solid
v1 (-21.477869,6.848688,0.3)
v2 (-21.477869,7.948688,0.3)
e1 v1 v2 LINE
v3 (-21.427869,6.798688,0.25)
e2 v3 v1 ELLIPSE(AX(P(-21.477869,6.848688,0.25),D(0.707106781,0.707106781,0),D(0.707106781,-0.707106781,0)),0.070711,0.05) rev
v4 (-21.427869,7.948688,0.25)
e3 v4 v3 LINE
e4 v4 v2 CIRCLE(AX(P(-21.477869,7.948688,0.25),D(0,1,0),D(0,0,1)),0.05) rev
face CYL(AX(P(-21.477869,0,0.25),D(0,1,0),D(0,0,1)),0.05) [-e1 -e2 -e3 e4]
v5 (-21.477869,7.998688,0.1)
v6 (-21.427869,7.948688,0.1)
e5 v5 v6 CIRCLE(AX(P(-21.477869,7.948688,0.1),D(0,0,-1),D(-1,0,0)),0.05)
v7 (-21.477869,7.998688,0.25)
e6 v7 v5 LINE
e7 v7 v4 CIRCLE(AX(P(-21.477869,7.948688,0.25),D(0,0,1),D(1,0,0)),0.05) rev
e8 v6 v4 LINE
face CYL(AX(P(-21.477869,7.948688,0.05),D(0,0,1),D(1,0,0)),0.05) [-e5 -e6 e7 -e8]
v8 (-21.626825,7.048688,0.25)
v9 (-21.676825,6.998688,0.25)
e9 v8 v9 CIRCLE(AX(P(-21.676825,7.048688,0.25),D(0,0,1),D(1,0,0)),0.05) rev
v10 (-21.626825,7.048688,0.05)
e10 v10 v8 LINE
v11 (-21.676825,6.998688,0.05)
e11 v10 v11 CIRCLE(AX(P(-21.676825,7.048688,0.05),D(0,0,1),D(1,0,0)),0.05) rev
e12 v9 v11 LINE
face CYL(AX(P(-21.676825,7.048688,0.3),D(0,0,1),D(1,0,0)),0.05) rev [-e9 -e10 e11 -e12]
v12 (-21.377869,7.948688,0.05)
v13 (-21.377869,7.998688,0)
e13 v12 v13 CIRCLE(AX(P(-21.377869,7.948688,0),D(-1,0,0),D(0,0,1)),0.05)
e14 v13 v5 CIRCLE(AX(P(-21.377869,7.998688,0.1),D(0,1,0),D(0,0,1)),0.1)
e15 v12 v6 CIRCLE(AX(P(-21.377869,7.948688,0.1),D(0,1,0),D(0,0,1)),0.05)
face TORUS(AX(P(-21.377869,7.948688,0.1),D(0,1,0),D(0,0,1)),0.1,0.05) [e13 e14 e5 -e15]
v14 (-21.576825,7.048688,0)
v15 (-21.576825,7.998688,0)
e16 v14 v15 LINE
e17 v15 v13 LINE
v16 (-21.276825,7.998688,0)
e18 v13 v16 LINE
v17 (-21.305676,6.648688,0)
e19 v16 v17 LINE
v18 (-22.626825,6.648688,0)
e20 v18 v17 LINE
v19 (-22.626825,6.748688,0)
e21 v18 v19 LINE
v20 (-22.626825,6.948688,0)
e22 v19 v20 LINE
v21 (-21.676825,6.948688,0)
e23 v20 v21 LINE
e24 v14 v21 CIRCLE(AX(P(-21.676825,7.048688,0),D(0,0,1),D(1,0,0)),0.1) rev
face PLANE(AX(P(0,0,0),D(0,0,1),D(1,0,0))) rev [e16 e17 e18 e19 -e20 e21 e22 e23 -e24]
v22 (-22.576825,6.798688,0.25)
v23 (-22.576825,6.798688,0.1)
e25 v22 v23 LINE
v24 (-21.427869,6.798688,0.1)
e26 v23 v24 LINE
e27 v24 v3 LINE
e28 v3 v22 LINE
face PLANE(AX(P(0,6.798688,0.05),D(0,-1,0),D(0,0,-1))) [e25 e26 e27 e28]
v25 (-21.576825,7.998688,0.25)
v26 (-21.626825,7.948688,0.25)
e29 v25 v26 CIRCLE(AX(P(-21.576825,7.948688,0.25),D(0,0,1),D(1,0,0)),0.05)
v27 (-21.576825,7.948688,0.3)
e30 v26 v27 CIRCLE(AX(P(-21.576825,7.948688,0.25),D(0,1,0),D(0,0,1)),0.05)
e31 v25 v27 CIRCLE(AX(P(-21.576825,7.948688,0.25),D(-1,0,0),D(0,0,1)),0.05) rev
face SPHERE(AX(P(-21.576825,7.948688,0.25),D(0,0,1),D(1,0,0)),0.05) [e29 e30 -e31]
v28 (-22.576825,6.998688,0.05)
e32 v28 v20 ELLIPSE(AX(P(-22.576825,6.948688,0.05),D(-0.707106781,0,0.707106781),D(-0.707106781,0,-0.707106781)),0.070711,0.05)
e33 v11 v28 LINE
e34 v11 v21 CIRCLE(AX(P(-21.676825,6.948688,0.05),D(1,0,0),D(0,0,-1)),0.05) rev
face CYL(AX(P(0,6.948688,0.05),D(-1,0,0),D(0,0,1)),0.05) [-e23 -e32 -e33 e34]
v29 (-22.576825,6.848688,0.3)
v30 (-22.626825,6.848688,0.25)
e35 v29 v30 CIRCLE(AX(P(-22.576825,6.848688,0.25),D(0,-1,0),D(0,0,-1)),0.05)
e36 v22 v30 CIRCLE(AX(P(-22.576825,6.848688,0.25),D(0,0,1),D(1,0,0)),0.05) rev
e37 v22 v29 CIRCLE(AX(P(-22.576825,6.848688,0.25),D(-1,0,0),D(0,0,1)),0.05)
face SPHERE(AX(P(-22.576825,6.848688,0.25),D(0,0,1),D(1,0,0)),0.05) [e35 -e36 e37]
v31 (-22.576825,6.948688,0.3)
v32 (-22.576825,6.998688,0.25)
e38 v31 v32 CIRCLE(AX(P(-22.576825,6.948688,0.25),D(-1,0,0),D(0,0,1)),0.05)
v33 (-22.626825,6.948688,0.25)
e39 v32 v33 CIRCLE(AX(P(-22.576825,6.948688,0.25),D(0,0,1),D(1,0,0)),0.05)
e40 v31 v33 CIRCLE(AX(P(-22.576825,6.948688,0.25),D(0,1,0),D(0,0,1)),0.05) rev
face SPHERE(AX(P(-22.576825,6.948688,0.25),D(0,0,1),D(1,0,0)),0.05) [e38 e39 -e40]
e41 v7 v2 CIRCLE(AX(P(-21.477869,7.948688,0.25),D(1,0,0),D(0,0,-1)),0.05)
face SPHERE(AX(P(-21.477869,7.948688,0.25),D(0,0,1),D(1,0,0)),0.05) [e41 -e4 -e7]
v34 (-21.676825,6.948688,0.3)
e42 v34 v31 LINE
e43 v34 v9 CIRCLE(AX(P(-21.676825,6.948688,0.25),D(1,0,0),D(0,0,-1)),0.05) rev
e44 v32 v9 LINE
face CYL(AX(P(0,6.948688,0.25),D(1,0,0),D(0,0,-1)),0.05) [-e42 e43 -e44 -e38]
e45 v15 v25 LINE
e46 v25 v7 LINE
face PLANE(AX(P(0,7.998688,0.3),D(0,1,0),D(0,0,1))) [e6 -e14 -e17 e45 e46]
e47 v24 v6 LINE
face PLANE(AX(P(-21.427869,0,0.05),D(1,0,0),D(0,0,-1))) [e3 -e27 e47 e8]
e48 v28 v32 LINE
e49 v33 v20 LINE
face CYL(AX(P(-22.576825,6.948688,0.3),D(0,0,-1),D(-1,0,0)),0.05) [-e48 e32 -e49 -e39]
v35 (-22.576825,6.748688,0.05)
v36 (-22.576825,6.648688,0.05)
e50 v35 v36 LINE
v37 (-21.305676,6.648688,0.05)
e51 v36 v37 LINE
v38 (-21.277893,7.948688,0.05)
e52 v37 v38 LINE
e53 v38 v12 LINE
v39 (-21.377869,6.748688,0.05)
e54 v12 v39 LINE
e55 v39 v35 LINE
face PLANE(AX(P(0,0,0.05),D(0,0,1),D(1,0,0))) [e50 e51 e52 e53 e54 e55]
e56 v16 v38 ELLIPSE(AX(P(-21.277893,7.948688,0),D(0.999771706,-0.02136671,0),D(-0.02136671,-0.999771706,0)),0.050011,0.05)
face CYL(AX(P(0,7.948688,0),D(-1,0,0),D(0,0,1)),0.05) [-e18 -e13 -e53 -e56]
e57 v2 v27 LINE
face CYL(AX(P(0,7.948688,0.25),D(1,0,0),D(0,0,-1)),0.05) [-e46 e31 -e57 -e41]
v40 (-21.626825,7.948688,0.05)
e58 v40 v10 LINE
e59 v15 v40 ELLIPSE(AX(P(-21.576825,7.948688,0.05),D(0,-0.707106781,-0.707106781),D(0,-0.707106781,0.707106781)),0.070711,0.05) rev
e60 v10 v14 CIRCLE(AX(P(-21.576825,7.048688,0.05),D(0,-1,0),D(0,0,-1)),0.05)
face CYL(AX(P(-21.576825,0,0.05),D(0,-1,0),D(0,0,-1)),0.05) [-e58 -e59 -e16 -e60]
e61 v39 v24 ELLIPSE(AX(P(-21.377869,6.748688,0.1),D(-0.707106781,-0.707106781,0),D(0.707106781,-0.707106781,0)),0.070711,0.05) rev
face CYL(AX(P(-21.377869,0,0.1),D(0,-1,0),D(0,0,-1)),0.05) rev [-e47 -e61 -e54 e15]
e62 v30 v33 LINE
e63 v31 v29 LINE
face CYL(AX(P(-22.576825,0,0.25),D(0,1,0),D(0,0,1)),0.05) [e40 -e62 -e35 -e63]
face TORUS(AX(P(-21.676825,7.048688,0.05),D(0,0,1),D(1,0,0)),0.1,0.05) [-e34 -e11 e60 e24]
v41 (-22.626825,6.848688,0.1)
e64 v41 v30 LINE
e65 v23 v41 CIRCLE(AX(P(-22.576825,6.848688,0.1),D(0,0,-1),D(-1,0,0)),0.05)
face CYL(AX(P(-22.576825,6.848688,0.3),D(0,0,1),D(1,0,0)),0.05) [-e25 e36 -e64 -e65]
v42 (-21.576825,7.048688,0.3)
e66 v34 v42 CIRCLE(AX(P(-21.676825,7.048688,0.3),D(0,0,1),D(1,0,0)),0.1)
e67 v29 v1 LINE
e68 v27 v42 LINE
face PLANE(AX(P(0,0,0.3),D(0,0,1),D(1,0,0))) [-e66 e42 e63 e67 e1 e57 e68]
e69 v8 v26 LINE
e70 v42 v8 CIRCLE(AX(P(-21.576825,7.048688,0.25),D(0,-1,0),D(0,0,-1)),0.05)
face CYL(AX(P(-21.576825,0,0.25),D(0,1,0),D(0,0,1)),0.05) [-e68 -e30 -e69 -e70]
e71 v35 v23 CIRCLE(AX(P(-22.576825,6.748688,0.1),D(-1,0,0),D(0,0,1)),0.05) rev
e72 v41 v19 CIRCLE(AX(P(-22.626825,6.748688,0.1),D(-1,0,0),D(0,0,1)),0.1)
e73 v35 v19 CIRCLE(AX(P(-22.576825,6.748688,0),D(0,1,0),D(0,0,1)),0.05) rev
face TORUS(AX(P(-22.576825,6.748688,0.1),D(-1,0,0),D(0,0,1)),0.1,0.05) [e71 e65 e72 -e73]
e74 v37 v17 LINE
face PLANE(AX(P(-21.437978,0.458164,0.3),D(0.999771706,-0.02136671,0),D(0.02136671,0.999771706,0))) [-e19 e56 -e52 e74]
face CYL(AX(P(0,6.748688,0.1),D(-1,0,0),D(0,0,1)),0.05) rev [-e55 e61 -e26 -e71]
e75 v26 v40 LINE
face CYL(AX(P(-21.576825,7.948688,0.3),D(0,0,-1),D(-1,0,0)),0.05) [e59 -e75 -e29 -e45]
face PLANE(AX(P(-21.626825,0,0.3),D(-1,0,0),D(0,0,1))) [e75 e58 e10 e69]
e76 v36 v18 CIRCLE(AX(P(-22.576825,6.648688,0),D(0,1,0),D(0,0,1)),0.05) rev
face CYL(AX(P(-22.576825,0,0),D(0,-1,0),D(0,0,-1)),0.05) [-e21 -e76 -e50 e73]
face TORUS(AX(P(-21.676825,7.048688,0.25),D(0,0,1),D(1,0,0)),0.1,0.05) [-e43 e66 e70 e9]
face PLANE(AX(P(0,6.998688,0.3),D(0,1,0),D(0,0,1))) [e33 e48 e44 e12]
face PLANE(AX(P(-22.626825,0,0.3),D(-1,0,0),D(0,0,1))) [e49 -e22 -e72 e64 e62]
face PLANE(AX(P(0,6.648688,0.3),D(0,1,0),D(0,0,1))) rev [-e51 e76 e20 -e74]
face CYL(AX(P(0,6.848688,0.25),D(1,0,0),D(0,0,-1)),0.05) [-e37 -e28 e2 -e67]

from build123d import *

# Parameters (mm, degrees)
EXTRUDE_1_DEPTH     = 0.3
CUT_EXTRUDE_1_DEPTH = 0.25
FILLET_1_R          = 0.05


with BuildPart() as part:
    # 草图1 → 凸台-拉伸1 (new body)
    with BuildSketch(Plane.XY):
        Polygon((-22.626824825, 6.798687558), (-22.626824825, 6.998687558), (-21.626824825, 6.998687558), (-21.626824825, 7.998687558), (-21.426824825, 7.998687558), (-21.426824825, 6.798687558), align=None)
        Polygon((-21.276824825, 7.998687558), (-21.30567647, 6.648687558), (-22.626824825, 6.648687558), (-22.626824825, 6.798687558), (-21.426824825, 6.798687558), (-21.426824825, 7.998687558), align=None)
    extrude(amount=EXTRUDE_1_DEPTH)

    # 草图2 → 切除-拉伸1 (cut)
    with BuildSketch(Plane.XY.offset(0.3)):
        Polygon((-21.30567647, 6.648687558), (-21.276824825, 7.998687558), (-21.427868997, 7.998687558), (-21.427868997, 6.798687558), (-21.477868997, 6.798687558), (-22.626824825, 6.798687558), (-22.626824825, 6.648687558), align=None)
    extrude(amount=-CUT_EXTRUDE_1_DEPTH, mode=Mode.SUBTRACT)

    # 圆角1
    fillet_1_edges = [part.edges().sort_by_distance(p)[0] for p in [
        (-22.626824825, 6.723687558, 0.05),
        (-21.352346911, 7.998687558, 0.05),
        (-22.626824825, 6.898687558, 0.3),
        (-22.126824825, 6.998687558, 0.3),
        (-21.527346911, 7.998687558, 0.3),
        (-21.427868997, 7.398687558, 0.3),
        (-22.027346911, 6.798687558, 0.3),
        (-21.626824825, 7.998687558, 0.15),
        (-21.626824825, 7.498687558, 0.3),
        (-21.626824825, 6.998687558, 0.15),
        (-21.626824825, 7.498687558, 0),
        (-22.626824825, 6.798687558, 0.175),
        (-22.626824825, 6.998687558, 0.15),
        (-21.427868997, 7.998687558, 0.175),
        (-22.027346911, 6.798687558, 0.05),
        (-22.126824825, 6.998687558, 0),
        (-21.427868997, 7.398687558, 0.05),
    ]]
    fillet(fillet_1_edges, radius=FILLET_1_R - 0.0001)  # a hair under: the kernel refuses the full size


solid = part.part
